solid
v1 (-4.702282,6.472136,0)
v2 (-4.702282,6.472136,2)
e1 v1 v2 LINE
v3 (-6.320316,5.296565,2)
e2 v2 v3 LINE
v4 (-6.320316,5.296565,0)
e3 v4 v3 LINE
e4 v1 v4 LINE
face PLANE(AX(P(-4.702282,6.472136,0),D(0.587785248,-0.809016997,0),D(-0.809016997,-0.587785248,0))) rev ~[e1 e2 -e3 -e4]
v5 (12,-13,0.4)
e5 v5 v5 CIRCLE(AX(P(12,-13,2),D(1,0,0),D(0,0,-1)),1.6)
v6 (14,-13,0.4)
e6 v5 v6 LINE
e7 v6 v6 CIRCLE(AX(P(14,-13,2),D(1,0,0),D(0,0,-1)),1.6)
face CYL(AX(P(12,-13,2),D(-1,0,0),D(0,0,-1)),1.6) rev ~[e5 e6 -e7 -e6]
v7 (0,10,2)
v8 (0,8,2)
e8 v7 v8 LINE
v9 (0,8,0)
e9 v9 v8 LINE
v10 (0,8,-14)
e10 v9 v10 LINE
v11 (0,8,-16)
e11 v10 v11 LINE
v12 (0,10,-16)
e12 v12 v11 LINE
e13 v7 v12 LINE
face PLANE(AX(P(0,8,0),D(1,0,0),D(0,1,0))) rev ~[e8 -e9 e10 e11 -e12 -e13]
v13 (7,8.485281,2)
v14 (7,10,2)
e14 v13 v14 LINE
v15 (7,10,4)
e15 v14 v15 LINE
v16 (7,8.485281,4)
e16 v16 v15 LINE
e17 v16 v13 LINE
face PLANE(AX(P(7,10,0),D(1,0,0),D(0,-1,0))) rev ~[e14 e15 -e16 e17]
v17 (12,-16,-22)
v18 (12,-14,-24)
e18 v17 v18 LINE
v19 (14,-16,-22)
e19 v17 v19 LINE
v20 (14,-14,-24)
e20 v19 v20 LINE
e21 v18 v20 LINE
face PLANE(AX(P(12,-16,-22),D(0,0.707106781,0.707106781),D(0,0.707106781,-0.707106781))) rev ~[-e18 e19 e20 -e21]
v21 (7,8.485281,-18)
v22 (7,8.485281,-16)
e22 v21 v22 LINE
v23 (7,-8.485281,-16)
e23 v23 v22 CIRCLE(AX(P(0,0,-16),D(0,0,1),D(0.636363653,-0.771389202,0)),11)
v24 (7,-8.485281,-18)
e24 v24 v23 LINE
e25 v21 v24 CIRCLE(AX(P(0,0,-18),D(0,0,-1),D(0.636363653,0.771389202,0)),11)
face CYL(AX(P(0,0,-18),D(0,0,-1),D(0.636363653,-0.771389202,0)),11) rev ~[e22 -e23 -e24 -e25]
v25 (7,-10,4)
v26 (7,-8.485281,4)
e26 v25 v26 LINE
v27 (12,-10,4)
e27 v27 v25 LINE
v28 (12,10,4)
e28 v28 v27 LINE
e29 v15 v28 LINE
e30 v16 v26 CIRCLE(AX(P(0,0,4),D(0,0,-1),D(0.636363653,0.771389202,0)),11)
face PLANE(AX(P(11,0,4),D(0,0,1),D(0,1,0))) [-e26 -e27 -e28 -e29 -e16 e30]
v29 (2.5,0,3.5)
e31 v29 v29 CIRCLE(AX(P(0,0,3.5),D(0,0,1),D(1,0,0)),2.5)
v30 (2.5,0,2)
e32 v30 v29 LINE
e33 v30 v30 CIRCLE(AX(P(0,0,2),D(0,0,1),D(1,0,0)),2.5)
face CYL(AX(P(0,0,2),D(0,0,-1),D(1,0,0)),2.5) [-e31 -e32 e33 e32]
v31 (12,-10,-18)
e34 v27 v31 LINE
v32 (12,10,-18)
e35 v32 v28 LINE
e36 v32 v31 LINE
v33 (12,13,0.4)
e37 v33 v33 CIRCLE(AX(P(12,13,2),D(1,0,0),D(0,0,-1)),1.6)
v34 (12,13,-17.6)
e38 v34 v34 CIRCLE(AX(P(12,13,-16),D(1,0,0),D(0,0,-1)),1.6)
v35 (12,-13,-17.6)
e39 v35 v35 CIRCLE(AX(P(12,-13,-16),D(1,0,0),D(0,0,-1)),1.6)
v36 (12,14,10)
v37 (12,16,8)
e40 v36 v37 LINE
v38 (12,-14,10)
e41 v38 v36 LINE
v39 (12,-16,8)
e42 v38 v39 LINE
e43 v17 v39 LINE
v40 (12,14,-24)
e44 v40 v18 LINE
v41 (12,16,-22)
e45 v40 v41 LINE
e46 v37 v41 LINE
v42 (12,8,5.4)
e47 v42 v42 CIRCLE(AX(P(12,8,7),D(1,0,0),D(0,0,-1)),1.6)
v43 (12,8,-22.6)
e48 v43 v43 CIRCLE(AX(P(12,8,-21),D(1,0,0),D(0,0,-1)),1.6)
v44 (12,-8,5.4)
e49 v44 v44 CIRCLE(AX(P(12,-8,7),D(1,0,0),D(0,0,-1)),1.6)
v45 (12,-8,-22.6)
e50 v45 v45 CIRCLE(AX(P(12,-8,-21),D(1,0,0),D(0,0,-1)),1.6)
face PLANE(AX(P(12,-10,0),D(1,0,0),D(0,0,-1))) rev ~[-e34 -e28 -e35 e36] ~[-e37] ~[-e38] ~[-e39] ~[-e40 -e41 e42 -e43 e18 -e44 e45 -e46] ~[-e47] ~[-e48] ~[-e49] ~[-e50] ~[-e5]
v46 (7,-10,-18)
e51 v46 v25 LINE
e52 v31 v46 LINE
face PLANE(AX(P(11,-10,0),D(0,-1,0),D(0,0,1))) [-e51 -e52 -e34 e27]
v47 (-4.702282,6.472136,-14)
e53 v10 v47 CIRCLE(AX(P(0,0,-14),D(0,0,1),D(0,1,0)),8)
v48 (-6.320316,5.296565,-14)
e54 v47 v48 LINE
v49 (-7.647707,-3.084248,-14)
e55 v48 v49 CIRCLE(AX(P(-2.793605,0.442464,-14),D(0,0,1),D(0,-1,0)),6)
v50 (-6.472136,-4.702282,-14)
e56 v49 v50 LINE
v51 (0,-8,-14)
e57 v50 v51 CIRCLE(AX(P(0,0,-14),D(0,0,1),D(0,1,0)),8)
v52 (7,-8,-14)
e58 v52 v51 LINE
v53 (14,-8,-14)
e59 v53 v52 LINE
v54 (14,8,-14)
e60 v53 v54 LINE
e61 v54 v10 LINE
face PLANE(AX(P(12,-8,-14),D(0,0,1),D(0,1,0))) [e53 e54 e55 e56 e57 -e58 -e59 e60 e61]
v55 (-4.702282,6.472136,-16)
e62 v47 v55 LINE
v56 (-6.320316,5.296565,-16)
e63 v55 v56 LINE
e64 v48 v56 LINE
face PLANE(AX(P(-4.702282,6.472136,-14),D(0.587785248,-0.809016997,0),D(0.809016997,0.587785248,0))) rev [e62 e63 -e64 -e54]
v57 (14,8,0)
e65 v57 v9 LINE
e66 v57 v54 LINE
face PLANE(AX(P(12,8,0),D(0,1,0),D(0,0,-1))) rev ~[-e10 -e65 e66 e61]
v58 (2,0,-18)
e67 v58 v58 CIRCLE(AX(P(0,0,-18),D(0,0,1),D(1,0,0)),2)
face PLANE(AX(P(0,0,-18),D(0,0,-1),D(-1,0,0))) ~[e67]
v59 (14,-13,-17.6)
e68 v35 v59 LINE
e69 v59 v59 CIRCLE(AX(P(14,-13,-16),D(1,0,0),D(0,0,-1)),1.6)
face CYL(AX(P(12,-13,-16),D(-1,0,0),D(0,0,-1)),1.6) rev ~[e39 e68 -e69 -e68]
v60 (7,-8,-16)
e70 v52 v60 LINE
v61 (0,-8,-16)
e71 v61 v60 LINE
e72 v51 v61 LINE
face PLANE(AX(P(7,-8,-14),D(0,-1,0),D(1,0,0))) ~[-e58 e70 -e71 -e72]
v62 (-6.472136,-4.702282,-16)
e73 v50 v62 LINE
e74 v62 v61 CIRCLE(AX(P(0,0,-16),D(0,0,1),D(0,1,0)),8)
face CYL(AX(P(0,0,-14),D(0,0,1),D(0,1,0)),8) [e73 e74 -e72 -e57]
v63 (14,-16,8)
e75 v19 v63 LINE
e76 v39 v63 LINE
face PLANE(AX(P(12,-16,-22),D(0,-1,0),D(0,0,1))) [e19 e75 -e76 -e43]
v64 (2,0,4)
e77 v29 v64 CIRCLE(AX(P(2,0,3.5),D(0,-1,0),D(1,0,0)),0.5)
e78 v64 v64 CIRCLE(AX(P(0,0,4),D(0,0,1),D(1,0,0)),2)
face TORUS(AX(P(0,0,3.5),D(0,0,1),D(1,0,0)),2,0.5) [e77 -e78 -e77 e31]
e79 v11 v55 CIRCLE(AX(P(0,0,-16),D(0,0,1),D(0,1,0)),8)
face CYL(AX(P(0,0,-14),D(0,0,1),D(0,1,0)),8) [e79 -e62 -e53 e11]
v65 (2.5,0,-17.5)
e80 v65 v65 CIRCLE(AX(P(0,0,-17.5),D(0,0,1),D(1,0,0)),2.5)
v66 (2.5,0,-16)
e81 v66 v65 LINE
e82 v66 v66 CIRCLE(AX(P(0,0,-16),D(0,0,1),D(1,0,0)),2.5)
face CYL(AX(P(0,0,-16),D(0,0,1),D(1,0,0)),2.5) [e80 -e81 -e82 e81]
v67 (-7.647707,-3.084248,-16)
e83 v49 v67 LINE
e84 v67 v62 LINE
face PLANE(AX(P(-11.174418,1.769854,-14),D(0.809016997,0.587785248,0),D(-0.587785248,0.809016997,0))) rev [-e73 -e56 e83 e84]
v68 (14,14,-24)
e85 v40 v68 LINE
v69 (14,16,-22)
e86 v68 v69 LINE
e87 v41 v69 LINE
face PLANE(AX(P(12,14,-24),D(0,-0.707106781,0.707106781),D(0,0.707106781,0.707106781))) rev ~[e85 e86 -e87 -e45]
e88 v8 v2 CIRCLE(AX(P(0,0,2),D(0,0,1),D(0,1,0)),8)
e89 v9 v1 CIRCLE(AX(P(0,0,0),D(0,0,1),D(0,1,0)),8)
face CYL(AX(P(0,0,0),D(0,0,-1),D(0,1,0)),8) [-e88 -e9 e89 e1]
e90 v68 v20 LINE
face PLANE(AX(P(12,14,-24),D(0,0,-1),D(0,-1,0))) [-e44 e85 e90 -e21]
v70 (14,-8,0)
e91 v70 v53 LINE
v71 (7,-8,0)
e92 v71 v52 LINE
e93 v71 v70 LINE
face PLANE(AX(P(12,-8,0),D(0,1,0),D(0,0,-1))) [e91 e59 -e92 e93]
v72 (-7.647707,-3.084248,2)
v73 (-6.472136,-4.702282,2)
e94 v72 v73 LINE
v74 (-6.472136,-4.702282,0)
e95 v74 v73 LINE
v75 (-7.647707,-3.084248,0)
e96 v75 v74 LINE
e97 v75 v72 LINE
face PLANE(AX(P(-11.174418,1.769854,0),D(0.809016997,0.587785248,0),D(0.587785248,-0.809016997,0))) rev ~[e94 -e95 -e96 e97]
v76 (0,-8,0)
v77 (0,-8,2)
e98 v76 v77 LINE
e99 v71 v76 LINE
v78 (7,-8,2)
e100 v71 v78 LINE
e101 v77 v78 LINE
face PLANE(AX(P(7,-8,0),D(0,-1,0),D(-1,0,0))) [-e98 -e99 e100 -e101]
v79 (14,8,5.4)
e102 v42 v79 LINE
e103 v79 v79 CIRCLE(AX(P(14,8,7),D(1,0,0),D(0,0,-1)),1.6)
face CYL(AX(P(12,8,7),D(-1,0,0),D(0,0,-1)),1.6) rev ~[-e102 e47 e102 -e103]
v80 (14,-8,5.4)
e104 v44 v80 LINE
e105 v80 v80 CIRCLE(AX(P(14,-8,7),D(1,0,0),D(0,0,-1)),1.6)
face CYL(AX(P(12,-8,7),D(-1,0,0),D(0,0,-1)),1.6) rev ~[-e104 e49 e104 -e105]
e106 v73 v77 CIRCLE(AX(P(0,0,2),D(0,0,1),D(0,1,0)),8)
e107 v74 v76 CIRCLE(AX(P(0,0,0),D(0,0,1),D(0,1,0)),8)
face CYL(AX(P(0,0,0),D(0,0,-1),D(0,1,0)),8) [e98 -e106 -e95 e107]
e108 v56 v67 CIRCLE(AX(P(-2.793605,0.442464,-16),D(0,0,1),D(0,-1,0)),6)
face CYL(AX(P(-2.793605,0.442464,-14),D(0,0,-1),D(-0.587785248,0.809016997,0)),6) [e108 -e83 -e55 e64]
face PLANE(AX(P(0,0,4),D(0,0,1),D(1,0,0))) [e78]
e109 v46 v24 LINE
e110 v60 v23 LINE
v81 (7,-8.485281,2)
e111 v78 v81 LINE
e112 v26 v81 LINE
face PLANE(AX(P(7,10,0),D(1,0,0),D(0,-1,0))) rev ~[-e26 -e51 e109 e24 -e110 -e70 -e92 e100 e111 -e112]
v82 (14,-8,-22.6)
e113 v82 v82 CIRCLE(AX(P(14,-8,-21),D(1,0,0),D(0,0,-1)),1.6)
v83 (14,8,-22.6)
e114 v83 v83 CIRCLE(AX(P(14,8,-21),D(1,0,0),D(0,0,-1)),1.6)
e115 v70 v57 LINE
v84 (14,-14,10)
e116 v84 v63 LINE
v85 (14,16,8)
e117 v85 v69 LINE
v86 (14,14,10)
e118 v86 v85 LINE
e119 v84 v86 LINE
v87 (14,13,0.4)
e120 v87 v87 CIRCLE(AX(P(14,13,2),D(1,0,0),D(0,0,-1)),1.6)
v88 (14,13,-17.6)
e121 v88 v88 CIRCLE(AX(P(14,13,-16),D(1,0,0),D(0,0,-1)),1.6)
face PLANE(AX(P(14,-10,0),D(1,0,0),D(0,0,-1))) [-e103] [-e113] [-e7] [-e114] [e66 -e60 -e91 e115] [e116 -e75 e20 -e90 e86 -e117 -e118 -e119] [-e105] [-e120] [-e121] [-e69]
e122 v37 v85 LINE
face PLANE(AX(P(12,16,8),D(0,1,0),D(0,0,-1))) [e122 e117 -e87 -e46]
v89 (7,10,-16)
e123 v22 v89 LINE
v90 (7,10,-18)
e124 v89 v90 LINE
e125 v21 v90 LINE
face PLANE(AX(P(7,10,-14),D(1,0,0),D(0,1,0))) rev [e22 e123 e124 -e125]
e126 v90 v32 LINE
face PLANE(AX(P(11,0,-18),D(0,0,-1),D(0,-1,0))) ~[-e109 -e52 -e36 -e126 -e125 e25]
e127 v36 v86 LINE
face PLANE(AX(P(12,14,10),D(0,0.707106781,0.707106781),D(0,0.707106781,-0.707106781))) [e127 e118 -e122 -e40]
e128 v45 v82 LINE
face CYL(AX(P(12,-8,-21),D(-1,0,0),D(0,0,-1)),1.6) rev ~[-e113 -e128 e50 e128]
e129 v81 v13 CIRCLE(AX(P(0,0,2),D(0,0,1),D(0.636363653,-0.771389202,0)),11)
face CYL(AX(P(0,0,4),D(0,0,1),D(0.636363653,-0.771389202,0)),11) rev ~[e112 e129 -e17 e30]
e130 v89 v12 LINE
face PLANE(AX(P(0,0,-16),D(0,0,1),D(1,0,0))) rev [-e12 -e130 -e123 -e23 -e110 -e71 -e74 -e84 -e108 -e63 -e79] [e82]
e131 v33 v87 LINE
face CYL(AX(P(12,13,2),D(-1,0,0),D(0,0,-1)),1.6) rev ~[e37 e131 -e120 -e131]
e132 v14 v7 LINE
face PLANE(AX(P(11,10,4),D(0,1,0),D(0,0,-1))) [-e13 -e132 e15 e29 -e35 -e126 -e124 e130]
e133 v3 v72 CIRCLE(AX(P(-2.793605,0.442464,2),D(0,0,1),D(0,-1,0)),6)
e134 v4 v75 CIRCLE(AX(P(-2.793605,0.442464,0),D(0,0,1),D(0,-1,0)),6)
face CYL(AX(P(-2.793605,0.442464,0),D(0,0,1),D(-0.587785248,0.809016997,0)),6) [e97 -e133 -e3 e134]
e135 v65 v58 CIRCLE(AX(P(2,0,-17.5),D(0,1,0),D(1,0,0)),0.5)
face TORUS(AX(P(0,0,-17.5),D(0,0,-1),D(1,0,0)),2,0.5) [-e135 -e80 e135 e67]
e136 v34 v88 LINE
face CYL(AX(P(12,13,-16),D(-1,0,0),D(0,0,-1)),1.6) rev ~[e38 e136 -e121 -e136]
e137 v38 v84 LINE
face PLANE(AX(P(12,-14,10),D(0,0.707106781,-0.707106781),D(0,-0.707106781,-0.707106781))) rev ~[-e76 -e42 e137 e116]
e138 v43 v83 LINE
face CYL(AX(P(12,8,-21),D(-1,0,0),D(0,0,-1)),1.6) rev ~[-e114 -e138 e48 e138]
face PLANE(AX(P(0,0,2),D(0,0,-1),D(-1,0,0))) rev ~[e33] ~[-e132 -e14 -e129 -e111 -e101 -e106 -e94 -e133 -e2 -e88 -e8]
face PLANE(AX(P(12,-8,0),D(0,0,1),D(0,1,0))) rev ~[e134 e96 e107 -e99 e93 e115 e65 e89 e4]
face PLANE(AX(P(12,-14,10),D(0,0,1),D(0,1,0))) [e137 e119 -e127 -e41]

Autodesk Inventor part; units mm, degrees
ref_plane "YZ Plane" through (0, 0, 0) normal (1, 0, 0) x (0, 1, 0)
sketch "Sketch1" plane through (0, 0, 0) normal (0, 0, 1) x (1, 0, 0)
  circle A0 centre (0, 0) radius 2.5
  circle A1 centre (20, 0) radius 2.5
  line L0 (7, 10) -> (20, 10)
  line L1 (7, -10) -> (20, -10)
  arc A2 (20, -10) -> (20, 10) centre (20, 0) ccw
  line L2 (7, 10) -> (7, 8)
  line L3 (7, -10) -> (7, -8)
  line L4 (7, 8) -> (0, 8)
  line L5 (7, -8) -> (0, -8)
  arc A3 (0, 8) -> (0, -8) centre (0, 0) ccw
  dimension "d0" = 5
  dimension "d1" = 20
  dimension "d2" = 10
  dimension "d3" = 2
  dimension "d4" = 13
extrude "Extrusion1" add sketch "Sketch1" along normal blind 4
sketch "Sketch2" plane through (0, 0, 4) normal (0, 0, 1) x (1, 0, 0)
  circle A0 centre (0, 0) radius 2.5 projected
  line L0 (7, 8) -> (0, 8) projected
  arc A1 (0, 8) -> (0, -8) centre (0, 0) ccw projected
  line L1 (0, -8) -> (7, -8) projected
  line L2 (7, -10) -> (20, -10) projected
  line L3 (7, 8) -> (7, -8)
  line L4 (7, -8) -> (0, -8)
  line L5 (7, 8) -> (0, 8)
  arc A2 (0, 8) -> (0, -8) centre (0, 0) ccw
extrude "Extrusion2" cut sketch "Sketch2" against normal blind 2
sketch "Sketch3" plane through (0, 0, 0) normal (0, 0, -1) x (-1, 0, 0)
  circle A0 centre (-20, 0) radius 2.5 projected
  circle A1 centre (0, 0) radius 2.5 projected
  line L0 (-7, 10) -> (-20, 10) projected
  arc A2 (-20, 10) -> (-20, -10) centre (-20, 0) ccw projected
  line L1 (-20, -10) -> (-7, -10) projected
  line L2 (-7, 8) -> (-7, 10) projected
  line L3 (-19, 10) -> (-19, 8)
  line L4 (-19, 8) -> (-11, 8)
  line L5 (-11, 8) -> (-11, -8)
  line L6 (-11, -8) -> (-19, -8)
  line L7 (-19, -8) -> (-19, -10)
  point P0 (-7, -8)
  dimension "d9" = 1
  dimension "d10" = 11
extrude "Extrusion3" cut sketch "Sketch3" against normal blind 2 contours L3 L4 L5 L6 L7 L1 A2 L0
sketch "Sketch4" plane through (0, 0, 4) normal (0, 0, 1) x (1, 0, 0)
  line L0 (7, 10) -> (7, -10)
  circle A0 centre (0, 0) radius 2.5
  arc A1 (7, -8.485281) -> (7, 8.485281) centre (0, 0) ccw
  dimension "d15" = 11
extrude "Extrusion4" cut sketch "Sketch4" against normal blind 2 contours A1 L0
sketch "Sketch5" plane through (0, 0, 0) normal (0, 0, -1) x (-1, 0, 0)
  line L0 (0, 8) -> (-7, 8) projected
  line L1 (-7, 10) -> (0, 10)
  line L2 (0, 10) -> (0, 8)
  line L3 (0, 8) -> (-7, 8)
  line L4 (-7, 8) -> (-7, 10)
  arc A0 (0, -8) -> (0, 8) centre (0, 0) ccw projected
extrude "Extrusion5" add sketch "Sketch5" against normal blind 2
sketch "Sketch6" plane through (0, 0, 0) normal (0, 0, -1) x (-1, 0, 0)
  line L0 (0, 10) -> (-19, 10) projected
  line L1 (-19, 8) -> (-20, 8)
  line L2 (-20, 8) -> (-20, 10)
  line L3 (-20, 10) -> (-19, 10)
  line L4 (-19, 10) -> (-19, 8)
  circle A0 centre (-20, 0) radius 2.5 projected
extrude "Extrusion6" add sketch "Sketch6" against normal blind 2 contours L1 L2 L3 L4
sketch "Sketch7" plane through (0, 0, 0) normal (0, 0, -1) x (-1, 0, 0)
  line L0 (-19, -8) -> (-19, -10)
  line L1 (-11, -8) -> (-19, -8)
  line L2 (-17.400642, -8) -> (-19, -9.162001)
  line L3 (-17.400642, -8) -> (-26.805206, 4.944272) construction
  line L4 (-26.805206, 4.944272) -> (-28.404564, 3.782271) construction
  line L5 (-28.404564, 3.782271) -> (-19, -9.162001) construction
  circle A0 centre (-20, 0) radius 2.5
  line L6 (-17.400642, -8) -> (-19, -8)
  line L7 (-19, -8) -> (-19, -9.162001)
  dimension "d21" = 16
  dimension "d22" = 8
  dimension "d23" = 36
extrude "Extrusion7" cut sketch "Sketch7" against normal blind 2 contours L1 L2 L0
sketch "Sketch9" plane through (0, 0, 2) normal (0, 0, 1) x (1, 0, 0)
  circle A0 centre (0, 0) radius 2.5
  arc A1 (11, 0) -> (7, 8.485281) centre (0, 0) ccw
  circle A2 centre (0, 0) radius 2.5
extrude "Extrusion8" add sketch "Sketch9" along normal mid plane 4
fillet "Fillet1" radius 0.5 1 edges at (-2.5, 0, 4)
sketch "Sketch10" plane through (0, 0, 0) normal (0, 0, -1) x (-1, 0, 0)
  arc A0 (0, -8) -> (0, 8) centre (0, 0) ccw
  line L0 (0, 10) -> (-20, 10)
  line L1 (4.702282, 6.472136) -> (11.174418, 1.769854)
  line L2 (11.174418, 1.769854) -> (6.472136, -4.702282)
  dimension "d30" = 144
extrude "Extrusion9" add sketch "Sketch10" against normal blind 2
fillet "Fillet2" radius 6 1 edges at (-11.1744, 1.7699, 1)
ref_plane "Work Plane1" through (11, 0, 4) normal (1, 0, 0) x (0, 1, 0)
split "Split1" plane through (11, 0, 4) removes the side toward (1, 0, 0)
sketch "Sketch11" plane through (11, -10, 0) normal (1, 0, 0) x (0, 0, -1)
  line L0 (0, 20) -> (0, 0) projected
  line L1 (-4, 20) -> (0, 20) projected
  line L2 (-4, 10) -> (-4, 20) projected
  line L3 (-4, 0) -> (-4, 10) projected
  line L4 (0, 0) -> (-4, 0) projected
  point P0 (0, 10)
extrude "Extrusion10" add sketch "Sketch11" along normal blind 1
ref_plane "Work Plane2" through (0, 0, -7) normal (0, 0, -1) x (-1, 0, 0)
mirror "Mirror1" about plane through (0, 0, -7) normal (0, 0, -1)
sketch "Sketch12" plane through (0, 0, 0) normal (0, 0, -1) x (-1, 0, 0)
  line L0 (-12, -10) -> (-7, -10)
  line L1 (-7, -10) -> (-7, -8)
  arc A0 (4.702282, 6.472136) -> (0, 8) centre (0, 0) ccw
  line L2 (0, 8) -> (0, 10)
  line L3 (0, 10) -> (-12, 10)
  line L4 (-12, -10) -> (-12, 10)
  line L5 (0, 8) -> (-12, 8)
  line L6 (-7, -8) -> (-12, -8)
extrude "Extrusion11" add sketch "Sketch12" along normal blind 14
sketch "Sketch17" plane through (12, -10, 0) normal (1, 0, 0) x (0, 0, -1)
  line L0 (0, 2) -> (0, 18) projected
  line L1 (0, 18) -> (14, 18) projected
  line L2 (14, 2) -> (14, 18) projected
  line L3 (0, 2) -> (14, 2) projected
  line L4 (18, 20) -> (18, 0) projected
  line L5 (-4, 20) -> (18, 20) projected
  line L6 (-4, 20) -> (-4, 0) projected
  line L7 (-8, 26) -> (22, 26)
  line L8 (24, 24) -> (24, -4)
  line L9 (22, -6) -> (-8, -6)
  line L10 (-10, -4) -> (-10, 24)
  line L11 (-7, 23) -> (21, 23) construction
  line L12 (21, 23) -> (21, -3) construction
  line L13 (21, -3) -> (-7, -3) construction
  line L14 (-7, -3) -> (-7, 23) construction
  circle A0 centre (-2, -3) radius 1.6
  circle A1 centre (16, -3) radius 1.6
  circle A2 centre (21, 2) radius 1.6
  circle A3 centre (21, 18) radius 1.6
  circle A4 centre (16, 23) radius 1.6
  circle A5 centre (-2, 23) radius 1.6
  circle A6 centre (-7, 18) radius 1.6
  circle A7 centre (-7, 2) radius 1.6
  line L15 (-10, 24) -> (-8, 26)
  line L16 (-10, -4) -> (-8, -6)
  line L17 (22, -6) -> (24, -4)
  line L18 (24, 24) -> (22, 26)
  point P0 (0, 10)
  point P1 (-10, 26)
  point P2 (24, -6)
  point P3 (24, 26)
  point P4 (-10, -6)
  point P5 (-7, 10)
  point P6 (-4, 10)
  point P7 (7, 23)
  point P8 (7, 20)
  point P9 (24, 10)
  point P10 (21, 10)
  point P11 (7, -6)
  point P12 (7, -3)
  dimension "d73" = 3.2
  dimension "d74" = 5
  dimension "d75" = 5
  dimension "d76" = 5
  dimension "d77" = 5
  dimension "d78" = 5
  dimension "d79" = 5
  dimension "d80" = 5
  dimension "d81" = 5
  dimension "d82" = 3
  dimension "d83" = 3
  dimension "d84" = 2
  dimension "d85" = 2
  dimension "d86" = 2
  dimension "d87" = 2
  dimension "d88" = 2
  dimension "d89" = 2
  dimension "d90" = 2
  dimension "d91" = 2
  dimension "d92" = 3
  dimension "d93" = 3
extrude "Extrusion16" add sketch "Sketch17" along normal blind 2
equation "\"d75\" = d74"
equation "\"d76\" = d75"
equation "\"d77\" = d76"
equation "\"d78\" = d76"
equation "\"d79\" = d75"
equation "\"d80\" = d75"
equation "\"d81\" = d75"
equation "\"d85\" = d84"
equation "\"d86\" = d84"
equation "\"d87\" = d86"
equation "\"d88\" = d84"
equation "\"d89\" = d88"
equation "\"d90\" = d84"
equation "\"d91\" = d90"
properties part number "z_axis_cable_mount_b" material "ABS Plastic"
